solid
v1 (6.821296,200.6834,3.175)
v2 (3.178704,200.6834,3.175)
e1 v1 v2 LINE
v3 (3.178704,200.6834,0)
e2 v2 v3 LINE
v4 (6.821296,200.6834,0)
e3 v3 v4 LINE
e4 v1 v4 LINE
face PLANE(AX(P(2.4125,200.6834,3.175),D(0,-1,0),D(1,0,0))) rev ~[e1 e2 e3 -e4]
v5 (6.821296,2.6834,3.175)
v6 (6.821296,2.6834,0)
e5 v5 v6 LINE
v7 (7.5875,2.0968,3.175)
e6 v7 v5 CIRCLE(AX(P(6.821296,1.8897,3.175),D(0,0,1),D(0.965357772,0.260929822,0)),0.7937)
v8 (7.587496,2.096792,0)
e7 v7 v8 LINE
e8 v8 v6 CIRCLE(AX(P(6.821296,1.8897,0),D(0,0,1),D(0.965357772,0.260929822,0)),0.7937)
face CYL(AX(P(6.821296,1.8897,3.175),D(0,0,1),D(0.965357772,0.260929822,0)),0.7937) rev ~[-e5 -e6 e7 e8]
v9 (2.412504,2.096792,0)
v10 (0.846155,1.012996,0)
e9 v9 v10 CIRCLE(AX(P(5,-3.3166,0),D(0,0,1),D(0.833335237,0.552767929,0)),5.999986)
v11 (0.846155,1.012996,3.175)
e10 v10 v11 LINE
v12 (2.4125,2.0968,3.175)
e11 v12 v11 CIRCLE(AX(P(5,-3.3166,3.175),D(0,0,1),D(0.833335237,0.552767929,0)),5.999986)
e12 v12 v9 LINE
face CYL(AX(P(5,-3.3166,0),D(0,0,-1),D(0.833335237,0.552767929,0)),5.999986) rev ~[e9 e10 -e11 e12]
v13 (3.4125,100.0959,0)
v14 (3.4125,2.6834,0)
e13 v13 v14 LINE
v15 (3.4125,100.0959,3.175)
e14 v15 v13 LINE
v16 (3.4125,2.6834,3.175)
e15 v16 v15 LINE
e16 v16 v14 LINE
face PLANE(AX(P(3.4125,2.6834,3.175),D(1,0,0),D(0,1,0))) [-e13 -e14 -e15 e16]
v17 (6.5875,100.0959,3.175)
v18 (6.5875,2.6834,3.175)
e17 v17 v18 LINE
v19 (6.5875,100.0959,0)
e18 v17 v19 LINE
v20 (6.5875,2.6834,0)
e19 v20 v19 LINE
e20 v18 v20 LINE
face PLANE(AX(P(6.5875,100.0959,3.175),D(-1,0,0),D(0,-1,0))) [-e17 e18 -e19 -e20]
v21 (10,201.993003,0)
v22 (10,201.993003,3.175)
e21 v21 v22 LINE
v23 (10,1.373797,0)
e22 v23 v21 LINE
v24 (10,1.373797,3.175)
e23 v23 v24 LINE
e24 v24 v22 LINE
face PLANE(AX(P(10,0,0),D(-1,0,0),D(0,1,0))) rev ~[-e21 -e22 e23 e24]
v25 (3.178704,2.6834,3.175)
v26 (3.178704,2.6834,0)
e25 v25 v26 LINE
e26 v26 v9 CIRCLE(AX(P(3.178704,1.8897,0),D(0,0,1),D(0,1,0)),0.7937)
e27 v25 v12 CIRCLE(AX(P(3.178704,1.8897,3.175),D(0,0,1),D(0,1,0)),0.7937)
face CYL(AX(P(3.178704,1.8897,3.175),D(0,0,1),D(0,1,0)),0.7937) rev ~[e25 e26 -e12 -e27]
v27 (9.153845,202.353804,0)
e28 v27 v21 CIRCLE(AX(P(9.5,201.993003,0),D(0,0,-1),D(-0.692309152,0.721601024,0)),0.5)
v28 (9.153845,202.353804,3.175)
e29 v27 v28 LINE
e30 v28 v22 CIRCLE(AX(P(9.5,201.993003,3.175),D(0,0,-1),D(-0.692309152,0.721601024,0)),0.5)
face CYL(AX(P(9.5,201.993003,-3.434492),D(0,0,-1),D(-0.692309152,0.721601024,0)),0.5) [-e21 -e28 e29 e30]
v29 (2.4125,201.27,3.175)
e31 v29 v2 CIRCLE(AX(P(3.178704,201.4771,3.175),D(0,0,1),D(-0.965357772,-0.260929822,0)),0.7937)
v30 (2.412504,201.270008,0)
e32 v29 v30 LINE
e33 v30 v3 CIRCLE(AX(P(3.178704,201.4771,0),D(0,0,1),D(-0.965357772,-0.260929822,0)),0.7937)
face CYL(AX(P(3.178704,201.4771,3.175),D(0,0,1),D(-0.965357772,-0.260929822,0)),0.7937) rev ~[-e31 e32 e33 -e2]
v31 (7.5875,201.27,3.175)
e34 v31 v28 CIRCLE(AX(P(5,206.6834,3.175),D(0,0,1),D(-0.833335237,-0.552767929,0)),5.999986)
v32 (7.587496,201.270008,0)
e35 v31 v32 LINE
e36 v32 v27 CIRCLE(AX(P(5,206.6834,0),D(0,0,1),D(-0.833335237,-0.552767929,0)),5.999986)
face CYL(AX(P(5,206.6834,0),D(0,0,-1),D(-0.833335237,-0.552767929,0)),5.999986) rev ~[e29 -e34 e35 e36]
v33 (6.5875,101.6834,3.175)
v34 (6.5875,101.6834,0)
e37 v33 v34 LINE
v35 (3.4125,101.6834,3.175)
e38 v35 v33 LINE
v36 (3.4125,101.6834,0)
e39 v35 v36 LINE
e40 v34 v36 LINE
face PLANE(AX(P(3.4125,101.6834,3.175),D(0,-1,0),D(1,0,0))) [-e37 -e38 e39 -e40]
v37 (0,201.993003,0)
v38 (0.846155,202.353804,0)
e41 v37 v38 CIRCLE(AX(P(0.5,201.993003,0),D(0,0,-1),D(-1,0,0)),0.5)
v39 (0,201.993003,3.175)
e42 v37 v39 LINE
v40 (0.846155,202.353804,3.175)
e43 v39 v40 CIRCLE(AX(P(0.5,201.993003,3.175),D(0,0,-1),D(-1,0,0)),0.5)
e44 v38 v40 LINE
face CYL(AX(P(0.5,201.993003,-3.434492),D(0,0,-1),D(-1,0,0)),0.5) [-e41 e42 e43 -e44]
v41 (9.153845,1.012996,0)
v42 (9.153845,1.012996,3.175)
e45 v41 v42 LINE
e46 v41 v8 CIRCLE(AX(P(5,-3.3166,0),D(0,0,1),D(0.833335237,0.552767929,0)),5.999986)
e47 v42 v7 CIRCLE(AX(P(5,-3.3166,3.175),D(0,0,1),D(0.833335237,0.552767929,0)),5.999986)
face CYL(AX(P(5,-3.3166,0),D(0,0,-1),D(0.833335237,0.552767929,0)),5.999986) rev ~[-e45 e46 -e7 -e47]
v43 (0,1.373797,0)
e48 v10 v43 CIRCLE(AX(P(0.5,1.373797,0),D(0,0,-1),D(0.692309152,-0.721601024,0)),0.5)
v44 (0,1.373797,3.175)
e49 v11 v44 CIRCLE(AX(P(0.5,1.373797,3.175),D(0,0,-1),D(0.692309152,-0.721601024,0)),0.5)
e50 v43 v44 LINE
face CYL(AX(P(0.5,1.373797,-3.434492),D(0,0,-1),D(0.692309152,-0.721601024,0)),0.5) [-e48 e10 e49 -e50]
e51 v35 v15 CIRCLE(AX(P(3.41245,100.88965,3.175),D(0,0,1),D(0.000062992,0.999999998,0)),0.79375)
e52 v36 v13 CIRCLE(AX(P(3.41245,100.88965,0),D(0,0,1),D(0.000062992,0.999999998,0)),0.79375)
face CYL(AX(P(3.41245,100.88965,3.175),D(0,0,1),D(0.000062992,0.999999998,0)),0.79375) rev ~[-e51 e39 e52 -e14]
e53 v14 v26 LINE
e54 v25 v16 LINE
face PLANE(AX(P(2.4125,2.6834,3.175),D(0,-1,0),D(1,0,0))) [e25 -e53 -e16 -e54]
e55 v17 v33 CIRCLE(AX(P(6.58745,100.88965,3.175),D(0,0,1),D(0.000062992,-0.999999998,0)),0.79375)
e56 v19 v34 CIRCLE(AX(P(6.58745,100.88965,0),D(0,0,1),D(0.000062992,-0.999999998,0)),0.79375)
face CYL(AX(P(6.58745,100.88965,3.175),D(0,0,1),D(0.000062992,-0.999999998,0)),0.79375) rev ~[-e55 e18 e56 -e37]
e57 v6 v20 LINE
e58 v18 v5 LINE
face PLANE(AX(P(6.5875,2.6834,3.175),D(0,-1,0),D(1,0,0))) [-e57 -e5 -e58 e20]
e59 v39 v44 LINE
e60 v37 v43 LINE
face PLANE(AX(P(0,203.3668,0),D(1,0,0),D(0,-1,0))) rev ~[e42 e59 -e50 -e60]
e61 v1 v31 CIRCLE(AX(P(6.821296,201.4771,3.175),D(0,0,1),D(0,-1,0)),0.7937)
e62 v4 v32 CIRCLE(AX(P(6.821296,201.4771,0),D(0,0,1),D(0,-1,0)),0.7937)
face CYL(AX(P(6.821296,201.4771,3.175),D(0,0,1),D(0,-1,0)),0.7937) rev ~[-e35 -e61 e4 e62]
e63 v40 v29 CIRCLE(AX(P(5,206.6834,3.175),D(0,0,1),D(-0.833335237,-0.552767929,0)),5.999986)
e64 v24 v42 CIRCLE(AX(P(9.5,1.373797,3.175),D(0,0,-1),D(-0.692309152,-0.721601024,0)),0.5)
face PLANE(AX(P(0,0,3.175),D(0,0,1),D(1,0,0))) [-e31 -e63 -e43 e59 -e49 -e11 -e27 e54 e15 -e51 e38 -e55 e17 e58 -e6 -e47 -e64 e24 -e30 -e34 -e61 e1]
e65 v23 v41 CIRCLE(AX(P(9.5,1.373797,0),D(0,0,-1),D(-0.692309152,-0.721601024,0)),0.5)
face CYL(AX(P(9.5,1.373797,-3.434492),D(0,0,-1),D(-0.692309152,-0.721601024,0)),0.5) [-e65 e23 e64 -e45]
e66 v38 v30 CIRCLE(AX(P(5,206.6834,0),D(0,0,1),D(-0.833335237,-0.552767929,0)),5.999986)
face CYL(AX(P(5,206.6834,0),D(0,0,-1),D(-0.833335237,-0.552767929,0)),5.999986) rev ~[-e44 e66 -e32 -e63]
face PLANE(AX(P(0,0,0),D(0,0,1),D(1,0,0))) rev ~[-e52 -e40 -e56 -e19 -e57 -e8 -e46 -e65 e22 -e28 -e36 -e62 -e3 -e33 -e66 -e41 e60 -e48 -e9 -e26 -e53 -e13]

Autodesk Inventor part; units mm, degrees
ref_plane "YZ Plane" through (0, 0, 0) normal (1, 0, 0) x (0, 1, 0)
ref_plane "XZ Plane" through (0, 0, 0) normal (0, 1, 0) x (-1, 0, 0)
ref_plane "XY Plane" through (0, 0, 0) normal (0, 0, 1) x (1, 0, 0)
sketch "Sketch1" plane through (0, 0, 0) normal (0, 0, 1) x (1, 0, 0)
  arc A0 (10, 0) -> (0, 0) centre (5, -3.3166) ccw
  arc A1 (0, 203.3668) -> (10, 203.3668) centre (5, 206.6834) ccw
  line L0 (0, 203.3668) -> (0, 0)
  line L1 (10, 0) -> (10, 203.3668)
  dimension "d0" = 10
  dimension "d1" = 6
  dimension "d2" = 210
extrude "Extrusion1" add sketch "Sketch1" along normal blind 3.175
sketch "Sketch2" plane through (0, 0, 3.175) normal (0, 0, 1) x (1, 0, 0)
  arc A0 (10, 0) -> (0, 0) centre (5, -3.3166) ccw projected
  arc A1 (0, 203.3668) -> (10, 203.3668) centre (5, 206.6834) ccw projected
  line L0 (0, 203.3668) -> (0, 0) projected
  line L1 (2.4125, 2.0968) -> (2.4125, 2.6834)
  line L2 (2.4125, 2.6834) -> (3.4125, 2.6834)
  line L3 (3.4125, 2.6834) -> (3.4125, 100.0959)
  line L4 (3.4125, 101.6834) -> (6.5875, 101.6834)
  line L5 (6.5875, 100.0959) -> (6.5875, 2.6834)
  line L6 (6.5875, 2.6834) -> (7.5875, 2.6834)
  line L7 (7.5875, 2.6834) -> (7.5875, 2.0968)
  arc A2 (3.4125, 101.6834) -> (3.4125, 100.0959) centre (3.4125, 100.8896) ccw
  arc A3 (6.5875, 100.0959) -> (6.5875, 101.6834) centre (6.5875, 100.8896) ccw
  line L8 (10, 0) -> (10, 203.3668) projected
  line L9 (2.4125, 201.27) -> (2.4125, 200.6834)
  line L10 (2.4125, 200.6834) -> (7.5875, 200.6834)
  line L11 (7.5875, 200.6834) -> (7.5875, 201.27)
  point P0 (5, 101.6834)
  dimension "d6" = 3.175
  dimension "d7" = 1
  dimension "d8" = 210
  dimension "d9" = 105
  dimension "d10" = 0.7937
extrude "Extrusion2" cut sketch "Sketch2" against normal up to next contours A0 L1 L2 L3 A2 L4 A3 L5 L6 L7 | L11 L10 A1 | L10 L9 A1
fillet "Fillet1" radius 0.7937 4 edges at (2.4125, 2.6834, 1.5875) (7.5875, 2.6834, 1.5875) (2.4125, 200.6834, 1.5875) (7.5875, 200.6834, 1.5875)
fillet "Fillet1" radius 0.5 4 edges at (0, 0, 1.5875) (10, 0, 1.5875) (10, 203.3668, 1.5875) (0, 203.3668, 1.5875)
equation "\"d3\" = THICKA"
equation "\"d6\" = THICKA"
equation "\"d9\" = 0.5 * d8"
equation "\"d11\" = THICKA"
equation "\"THICKA\" = 3.175"
equation "\"THICKB\" = 6.731"
equation "\"THICKC\" = 12.7"
equation "\"MAGDIA\" = 9.5"
equation "\"BALLDIA\" = 12"
properties part number "Effector_Arm_Ball"
